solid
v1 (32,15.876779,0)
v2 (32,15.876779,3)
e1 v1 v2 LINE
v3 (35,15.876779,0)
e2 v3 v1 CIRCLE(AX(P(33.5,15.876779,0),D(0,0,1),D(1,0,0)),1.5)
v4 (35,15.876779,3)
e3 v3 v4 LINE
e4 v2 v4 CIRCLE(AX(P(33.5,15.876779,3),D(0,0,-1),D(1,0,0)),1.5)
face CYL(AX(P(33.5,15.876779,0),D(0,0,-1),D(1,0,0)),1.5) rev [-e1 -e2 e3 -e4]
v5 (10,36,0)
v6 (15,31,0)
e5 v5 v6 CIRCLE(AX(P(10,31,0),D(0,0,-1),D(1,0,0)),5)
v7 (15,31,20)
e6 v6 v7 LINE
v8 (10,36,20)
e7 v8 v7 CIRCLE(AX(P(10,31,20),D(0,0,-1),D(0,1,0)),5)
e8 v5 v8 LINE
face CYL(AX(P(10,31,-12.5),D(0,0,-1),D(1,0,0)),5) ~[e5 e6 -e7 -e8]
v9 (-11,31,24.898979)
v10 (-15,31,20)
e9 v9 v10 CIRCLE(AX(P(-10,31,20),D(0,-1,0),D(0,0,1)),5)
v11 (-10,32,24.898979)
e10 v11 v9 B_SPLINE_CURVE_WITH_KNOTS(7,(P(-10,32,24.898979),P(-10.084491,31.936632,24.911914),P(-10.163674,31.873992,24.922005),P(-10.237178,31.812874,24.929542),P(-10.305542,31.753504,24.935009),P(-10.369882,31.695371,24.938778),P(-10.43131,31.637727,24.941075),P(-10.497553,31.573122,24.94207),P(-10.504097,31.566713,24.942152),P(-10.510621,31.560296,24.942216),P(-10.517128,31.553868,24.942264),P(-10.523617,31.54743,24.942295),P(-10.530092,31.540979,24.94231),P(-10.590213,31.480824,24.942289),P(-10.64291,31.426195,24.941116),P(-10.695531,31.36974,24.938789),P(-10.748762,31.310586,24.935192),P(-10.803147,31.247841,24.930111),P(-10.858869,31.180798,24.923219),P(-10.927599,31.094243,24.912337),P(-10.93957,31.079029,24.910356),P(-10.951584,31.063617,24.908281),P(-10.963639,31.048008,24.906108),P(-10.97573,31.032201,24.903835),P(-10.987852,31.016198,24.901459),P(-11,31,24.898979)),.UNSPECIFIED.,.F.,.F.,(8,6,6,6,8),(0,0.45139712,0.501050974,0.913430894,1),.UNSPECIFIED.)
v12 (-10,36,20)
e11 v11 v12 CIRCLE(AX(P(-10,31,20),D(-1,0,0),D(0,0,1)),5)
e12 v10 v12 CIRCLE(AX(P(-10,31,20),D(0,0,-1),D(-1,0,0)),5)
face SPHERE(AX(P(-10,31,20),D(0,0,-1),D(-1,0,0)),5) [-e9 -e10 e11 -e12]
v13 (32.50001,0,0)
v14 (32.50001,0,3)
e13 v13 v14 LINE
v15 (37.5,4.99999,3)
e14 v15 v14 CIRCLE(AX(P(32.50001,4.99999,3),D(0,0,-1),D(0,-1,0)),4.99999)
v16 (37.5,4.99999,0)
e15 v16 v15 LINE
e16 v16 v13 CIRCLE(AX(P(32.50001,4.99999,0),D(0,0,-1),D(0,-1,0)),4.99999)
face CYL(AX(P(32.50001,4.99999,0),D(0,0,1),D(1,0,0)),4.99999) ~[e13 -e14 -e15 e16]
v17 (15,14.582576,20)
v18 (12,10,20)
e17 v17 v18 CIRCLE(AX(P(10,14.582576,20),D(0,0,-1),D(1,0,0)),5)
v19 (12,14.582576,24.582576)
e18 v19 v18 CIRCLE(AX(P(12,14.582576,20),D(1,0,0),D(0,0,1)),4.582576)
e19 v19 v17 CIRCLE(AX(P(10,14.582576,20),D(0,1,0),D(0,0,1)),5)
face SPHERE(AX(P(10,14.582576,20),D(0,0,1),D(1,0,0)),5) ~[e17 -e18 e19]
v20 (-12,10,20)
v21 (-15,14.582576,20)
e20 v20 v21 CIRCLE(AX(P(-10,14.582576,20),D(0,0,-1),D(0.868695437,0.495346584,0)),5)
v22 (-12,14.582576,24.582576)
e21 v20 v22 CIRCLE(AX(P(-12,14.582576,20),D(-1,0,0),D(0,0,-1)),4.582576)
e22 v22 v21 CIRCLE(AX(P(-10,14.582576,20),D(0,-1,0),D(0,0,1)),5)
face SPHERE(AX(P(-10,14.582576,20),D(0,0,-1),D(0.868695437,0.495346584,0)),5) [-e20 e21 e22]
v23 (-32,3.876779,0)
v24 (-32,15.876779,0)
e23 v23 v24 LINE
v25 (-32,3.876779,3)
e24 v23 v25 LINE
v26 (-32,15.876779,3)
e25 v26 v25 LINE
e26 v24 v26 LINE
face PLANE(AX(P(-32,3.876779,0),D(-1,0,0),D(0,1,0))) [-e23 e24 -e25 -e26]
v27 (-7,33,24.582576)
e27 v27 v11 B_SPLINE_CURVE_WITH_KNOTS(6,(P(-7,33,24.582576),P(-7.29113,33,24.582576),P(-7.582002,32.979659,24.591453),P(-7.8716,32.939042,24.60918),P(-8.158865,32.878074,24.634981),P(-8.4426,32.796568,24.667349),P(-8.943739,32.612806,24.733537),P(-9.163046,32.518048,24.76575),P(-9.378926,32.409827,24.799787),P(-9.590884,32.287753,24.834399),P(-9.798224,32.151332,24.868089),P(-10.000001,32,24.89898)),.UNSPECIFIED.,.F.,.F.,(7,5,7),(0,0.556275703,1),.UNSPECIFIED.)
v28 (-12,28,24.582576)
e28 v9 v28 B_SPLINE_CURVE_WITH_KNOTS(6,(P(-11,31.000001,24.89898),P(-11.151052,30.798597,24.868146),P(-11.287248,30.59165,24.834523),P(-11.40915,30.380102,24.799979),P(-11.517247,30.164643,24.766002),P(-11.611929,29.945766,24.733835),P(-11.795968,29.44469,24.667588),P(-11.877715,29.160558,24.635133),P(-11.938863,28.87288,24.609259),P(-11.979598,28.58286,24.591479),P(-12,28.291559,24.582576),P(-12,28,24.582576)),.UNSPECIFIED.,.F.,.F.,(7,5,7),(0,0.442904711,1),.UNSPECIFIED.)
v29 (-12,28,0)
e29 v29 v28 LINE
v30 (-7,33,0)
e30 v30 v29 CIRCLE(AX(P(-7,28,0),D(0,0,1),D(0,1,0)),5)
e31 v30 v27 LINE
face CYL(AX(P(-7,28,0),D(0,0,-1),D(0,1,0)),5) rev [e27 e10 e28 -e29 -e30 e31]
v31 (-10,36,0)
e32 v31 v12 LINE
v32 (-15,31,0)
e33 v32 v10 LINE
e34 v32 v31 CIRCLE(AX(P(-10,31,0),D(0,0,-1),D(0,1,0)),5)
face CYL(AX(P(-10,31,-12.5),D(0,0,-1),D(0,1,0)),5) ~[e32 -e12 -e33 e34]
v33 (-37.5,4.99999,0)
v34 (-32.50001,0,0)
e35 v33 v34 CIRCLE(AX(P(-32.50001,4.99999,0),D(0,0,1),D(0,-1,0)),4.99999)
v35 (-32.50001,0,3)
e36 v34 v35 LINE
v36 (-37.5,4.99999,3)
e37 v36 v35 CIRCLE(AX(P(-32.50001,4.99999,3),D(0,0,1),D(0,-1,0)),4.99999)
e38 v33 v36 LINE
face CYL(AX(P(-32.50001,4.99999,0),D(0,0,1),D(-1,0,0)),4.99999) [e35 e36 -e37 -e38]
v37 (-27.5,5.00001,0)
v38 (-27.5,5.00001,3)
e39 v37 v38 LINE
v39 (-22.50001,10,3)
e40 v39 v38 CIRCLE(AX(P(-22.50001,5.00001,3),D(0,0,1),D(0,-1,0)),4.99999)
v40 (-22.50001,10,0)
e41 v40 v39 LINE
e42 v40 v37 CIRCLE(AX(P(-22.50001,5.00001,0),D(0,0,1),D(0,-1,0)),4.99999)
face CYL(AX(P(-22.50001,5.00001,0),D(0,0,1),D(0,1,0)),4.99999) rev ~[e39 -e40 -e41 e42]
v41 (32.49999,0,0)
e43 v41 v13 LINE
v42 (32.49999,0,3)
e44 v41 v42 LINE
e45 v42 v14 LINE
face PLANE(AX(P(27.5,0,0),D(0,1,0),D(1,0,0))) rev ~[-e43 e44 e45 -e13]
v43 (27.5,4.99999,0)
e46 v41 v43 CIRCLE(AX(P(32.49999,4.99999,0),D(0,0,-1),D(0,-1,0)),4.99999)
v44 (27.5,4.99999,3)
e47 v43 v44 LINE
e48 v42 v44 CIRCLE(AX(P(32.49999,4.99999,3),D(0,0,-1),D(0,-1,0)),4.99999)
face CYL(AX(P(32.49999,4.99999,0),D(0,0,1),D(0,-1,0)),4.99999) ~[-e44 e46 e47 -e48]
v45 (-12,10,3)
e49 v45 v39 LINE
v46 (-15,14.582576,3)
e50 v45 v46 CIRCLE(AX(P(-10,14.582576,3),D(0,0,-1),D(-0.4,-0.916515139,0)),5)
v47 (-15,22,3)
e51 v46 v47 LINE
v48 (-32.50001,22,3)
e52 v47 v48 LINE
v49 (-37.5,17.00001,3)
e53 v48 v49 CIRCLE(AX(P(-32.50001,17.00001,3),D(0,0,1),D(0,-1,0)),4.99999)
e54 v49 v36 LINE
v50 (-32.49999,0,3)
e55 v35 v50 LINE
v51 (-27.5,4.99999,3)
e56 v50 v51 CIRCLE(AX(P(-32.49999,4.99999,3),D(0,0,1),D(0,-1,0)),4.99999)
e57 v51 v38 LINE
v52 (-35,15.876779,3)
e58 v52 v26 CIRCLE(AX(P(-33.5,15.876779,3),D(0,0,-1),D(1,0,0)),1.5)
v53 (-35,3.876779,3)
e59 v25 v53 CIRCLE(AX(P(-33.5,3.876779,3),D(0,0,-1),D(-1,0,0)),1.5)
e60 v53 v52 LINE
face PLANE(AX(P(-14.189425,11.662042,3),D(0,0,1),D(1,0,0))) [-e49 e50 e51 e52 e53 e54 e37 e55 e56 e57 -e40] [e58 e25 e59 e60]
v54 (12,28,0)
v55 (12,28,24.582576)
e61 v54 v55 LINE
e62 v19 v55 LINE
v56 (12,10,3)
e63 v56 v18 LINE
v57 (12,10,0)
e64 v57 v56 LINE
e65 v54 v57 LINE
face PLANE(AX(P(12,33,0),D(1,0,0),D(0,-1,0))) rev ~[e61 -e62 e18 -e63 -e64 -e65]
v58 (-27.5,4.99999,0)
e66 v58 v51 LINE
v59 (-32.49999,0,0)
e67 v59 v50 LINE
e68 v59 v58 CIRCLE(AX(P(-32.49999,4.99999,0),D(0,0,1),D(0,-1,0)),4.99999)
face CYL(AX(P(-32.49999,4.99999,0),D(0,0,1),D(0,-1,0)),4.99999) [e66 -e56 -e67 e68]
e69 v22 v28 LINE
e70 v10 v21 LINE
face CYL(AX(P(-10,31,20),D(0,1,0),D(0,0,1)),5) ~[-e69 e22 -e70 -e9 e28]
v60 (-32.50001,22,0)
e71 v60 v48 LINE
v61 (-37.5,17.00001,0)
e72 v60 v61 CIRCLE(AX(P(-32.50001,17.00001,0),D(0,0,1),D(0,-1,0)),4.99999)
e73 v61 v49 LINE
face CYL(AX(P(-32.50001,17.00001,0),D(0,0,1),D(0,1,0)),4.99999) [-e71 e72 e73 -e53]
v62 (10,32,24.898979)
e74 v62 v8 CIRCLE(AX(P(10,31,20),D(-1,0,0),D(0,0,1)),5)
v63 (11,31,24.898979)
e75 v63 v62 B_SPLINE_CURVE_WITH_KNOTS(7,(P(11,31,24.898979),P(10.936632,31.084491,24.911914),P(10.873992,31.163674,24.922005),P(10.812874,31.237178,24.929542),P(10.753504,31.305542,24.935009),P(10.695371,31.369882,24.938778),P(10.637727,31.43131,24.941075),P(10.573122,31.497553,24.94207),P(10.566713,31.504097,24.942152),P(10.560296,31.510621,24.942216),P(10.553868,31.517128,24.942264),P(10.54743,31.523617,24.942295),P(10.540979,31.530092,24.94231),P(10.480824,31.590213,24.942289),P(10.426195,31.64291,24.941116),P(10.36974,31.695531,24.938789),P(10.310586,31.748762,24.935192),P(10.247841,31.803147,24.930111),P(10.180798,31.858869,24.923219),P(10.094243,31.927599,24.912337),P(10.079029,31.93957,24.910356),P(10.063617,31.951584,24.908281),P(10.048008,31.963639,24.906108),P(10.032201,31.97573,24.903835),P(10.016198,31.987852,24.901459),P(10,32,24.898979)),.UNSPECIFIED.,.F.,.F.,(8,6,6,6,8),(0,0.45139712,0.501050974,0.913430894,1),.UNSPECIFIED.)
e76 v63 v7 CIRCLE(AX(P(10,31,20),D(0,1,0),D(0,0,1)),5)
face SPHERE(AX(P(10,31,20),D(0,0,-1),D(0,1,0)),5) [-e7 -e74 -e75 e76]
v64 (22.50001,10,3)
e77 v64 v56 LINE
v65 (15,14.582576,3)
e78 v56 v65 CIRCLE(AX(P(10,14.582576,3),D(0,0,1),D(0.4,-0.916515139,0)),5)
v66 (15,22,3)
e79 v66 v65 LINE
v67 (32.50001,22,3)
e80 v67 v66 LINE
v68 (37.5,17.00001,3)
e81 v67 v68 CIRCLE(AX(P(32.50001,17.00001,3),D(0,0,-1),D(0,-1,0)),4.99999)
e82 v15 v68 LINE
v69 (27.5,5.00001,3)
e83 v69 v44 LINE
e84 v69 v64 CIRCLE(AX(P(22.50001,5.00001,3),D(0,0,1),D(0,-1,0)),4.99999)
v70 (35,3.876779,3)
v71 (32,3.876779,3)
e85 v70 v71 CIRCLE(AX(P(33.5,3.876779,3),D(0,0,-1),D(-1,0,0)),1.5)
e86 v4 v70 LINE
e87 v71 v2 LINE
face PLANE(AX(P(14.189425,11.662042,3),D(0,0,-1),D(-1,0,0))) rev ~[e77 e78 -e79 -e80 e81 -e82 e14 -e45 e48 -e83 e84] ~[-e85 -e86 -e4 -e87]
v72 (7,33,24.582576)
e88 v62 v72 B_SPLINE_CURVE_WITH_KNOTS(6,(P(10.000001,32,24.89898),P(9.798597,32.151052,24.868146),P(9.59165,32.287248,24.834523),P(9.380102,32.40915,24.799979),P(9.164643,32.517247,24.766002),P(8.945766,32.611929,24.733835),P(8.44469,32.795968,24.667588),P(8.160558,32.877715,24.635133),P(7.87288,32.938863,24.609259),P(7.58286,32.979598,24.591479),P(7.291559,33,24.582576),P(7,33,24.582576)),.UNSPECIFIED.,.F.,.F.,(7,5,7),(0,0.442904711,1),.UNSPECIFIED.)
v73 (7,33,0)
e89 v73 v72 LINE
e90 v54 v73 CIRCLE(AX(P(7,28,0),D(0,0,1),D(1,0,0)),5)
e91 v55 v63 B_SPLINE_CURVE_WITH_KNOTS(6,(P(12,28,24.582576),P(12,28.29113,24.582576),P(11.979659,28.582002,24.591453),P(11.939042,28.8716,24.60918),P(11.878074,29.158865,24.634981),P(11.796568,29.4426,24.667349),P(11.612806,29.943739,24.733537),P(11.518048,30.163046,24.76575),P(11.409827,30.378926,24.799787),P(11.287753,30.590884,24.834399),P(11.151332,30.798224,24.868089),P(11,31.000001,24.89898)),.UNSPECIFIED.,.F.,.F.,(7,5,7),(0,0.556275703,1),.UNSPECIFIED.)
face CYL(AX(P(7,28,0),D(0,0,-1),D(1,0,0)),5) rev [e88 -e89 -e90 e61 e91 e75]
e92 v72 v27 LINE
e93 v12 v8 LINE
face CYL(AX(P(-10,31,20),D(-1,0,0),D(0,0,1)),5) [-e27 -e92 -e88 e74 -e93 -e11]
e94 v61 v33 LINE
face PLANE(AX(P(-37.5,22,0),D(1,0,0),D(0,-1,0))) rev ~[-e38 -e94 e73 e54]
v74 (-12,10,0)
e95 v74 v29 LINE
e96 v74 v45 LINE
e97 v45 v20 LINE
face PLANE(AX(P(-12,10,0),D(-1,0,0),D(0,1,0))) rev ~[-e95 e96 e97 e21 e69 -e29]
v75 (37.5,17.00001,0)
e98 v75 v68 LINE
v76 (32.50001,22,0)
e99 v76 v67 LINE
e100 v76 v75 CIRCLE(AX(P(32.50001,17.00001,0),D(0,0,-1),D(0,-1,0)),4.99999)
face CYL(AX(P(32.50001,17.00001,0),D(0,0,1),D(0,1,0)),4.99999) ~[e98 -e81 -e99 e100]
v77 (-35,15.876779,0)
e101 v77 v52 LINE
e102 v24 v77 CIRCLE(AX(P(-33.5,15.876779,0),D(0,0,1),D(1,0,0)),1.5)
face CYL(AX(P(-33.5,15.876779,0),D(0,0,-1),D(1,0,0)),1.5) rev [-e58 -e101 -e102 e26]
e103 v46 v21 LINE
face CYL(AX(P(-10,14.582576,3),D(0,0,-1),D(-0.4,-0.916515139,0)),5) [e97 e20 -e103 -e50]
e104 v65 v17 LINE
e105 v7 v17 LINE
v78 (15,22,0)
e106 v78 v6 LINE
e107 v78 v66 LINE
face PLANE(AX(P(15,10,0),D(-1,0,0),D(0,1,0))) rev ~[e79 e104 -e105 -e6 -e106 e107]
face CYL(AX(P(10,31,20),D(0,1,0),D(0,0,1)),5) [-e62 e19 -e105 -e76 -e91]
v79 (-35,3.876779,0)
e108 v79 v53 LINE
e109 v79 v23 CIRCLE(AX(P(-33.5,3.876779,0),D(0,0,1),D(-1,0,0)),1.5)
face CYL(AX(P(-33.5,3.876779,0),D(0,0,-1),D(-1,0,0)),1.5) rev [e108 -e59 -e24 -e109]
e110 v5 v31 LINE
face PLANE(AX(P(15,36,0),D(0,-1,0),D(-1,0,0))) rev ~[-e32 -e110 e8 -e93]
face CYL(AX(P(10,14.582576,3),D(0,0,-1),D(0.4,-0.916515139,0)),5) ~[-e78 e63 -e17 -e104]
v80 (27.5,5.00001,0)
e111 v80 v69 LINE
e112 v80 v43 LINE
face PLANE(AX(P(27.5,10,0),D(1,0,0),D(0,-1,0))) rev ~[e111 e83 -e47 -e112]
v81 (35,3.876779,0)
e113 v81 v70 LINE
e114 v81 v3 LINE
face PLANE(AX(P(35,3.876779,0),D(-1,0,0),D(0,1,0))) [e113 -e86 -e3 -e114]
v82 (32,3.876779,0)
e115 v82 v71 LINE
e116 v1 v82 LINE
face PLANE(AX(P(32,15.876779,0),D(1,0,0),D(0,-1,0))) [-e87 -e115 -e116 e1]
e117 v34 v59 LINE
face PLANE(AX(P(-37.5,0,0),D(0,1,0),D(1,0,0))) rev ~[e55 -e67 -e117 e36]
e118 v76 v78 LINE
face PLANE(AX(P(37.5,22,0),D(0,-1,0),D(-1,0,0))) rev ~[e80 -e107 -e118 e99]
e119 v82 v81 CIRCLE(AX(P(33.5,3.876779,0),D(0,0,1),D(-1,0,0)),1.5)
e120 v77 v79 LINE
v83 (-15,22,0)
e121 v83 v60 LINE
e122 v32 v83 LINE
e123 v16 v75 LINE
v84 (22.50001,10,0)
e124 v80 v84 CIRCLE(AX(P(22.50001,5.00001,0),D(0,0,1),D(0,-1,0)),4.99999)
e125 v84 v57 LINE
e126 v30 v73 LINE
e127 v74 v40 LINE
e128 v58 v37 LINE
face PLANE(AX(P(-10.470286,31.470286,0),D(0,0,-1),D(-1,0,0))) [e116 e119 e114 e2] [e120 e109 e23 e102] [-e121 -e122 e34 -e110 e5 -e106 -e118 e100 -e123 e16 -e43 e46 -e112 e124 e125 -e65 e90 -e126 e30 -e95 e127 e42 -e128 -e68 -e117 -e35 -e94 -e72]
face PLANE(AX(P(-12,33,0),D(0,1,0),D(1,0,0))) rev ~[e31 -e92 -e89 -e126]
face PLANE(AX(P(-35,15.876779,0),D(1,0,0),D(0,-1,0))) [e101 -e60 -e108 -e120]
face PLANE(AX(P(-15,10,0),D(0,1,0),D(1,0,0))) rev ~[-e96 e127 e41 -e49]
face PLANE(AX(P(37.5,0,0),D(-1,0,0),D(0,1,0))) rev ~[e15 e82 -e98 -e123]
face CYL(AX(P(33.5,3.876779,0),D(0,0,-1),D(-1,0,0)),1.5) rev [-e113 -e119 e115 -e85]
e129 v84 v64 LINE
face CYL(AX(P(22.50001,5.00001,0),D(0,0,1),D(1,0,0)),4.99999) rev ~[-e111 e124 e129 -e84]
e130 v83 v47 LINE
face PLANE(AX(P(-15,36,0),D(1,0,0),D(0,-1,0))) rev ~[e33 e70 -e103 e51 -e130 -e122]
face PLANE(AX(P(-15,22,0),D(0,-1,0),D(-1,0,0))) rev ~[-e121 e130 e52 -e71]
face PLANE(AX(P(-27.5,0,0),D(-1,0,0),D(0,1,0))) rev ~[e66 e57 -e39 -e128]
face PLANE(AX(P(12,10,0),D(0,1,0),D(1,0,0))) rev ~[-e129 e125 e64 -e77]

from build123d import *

# Parameters (mm, degrees)
F2_DEPTH     = 25
F3_DEPTH     = 3
F4_DEPTH     = 25
F5_R         = 4.99999
F6_T1_DEPTH  = 25
F6_T3_DEPTH  = 25
F6_T5_DEPTH  = 50
F6_T7_DEPTH  = 33.4564392374
F6_T9_DEPTH  = 50
F6_T11_DEPTH = 33.4564392374
F7_T1_DEPTH  = 16.417424305
F7_T3_DEPTH  = 20
F7_T6_ANGLE  = 89.9999999974
F7_T8_ANGLE  = 89.9999999974
F7_T10_ANGLE = 209.6926070845
F7_T12_ANGLE = 209.6926070845


# Not quite as in the source:
# - a fillet or chamfer that OpenCascade refuses, or shapes differently, is made with other operations: its cross-section is extruded or revolved along the edge and cut away or added
# - a fillet or chamfer is up to 0.001 mm smaller than in the source, because OpenCascade refuses the exact size


with BuildPart() as f2:
    # F0 (on Top) → F2 (new body)
    with BuildSketch(Plane.XY):
        Polygon((15, 36), (0, 36), (-15, 36), (-15, 22), (-15, 10), (-12, 10), (-12, 33), (0, 33), (12, 33), (12, 10), (15, 10), (15, 22), align=None)
    extrude(amount=F2_DEPTH)

    # F0 (on Top) → F3 (join)
    with BuildSketch(Plane.XY):
        Polygon((-15, 10), (-15, 22), (-37.5, 22), (-37.5, 0), (-27.5, 0), (-27.5, 10), align=None)
        Polygon((37.5, 22), (15, 22), (15, 10), (27.5, 10), (27.5, 0), (37.5, 0), align=None)
    extrude(amount=F3_DEPTH)

    # F1 (on Top) → F4 (cut)
    with BuildSketch(Plane.XY):
        with BuildLine():
            Line((35, 3.8767794613), (35, 15.8767794613))
            ThreePointArc((35, 15.8767794613), (33.5, 17.3767794613), (32, 15.8767794613))
            Line((32, 15.8767794613), (32, 3.8767794613))
            ThreePointArc((32, 3.8767794613), (33.5, 2.3767794613), (35, 3.8767794613))
        make_face()
        with BuildLine():
            ThreePointArc((-32, 15.8767794613), (-33.5, 17.3767794613), (-35, 15.8767794613))
            Line((-35, 15.8767794613), (-35, 3.8767794613))
            ThreePointArc((-35, 3.8767794613), (-33.5, 2.3767794613), (-32, 3.8767794613))
            Line((-32, 3.8767794613), (-32, 15.8767794613))
        make_face()
    extrude(amount=F4_DEPTH, mode=Mode.SUBTRACT)

    # F5 (radius 5 in the source; OpenCascade refuses exactly that, so slightly less here)
    f5_edges = [f2.edges().sort_by_distance(p)[0] for p in [
        (-37.5, 0, 1.5),
        (-27.5, 0, 1.5),
        (-37.5, 22, 1.5),
        (37.5, 22, 1.5),
        (37.5, 0, 1.5),
        (27.5, 0, 1.5),
        (27.5, 10, 1.5),
        (-27.5, 10, 1.5),
    ]]
    fillet(f5_edges, radius=F5_R)

    # F6: fillet of radius 5 on 6 edges, made by hand

    # F6_s2 → F6_t1 (join)
    with BuildSketch(Plane.XY):
        with BuildLine():
            ThreePointArc((12, 28), (10.5355339059, 31.5355339059), (7, 33))
            Line((7, 33), (12, 33))
            Line((12, 33), (12, 28))
        make_face()
    extrude(amount=F6_T1_DEPTH)

    # F6_s4 → F6_t3 (join)
    with BuildSketch(Plane.XY):
        with BuildLine():
            ThreePointArc((-7, 33), (-10.5355339059, 31.5355339059), (-12, 28))
            Line((-12, 28), (-12, 33))
            Line((-12, 33), (-7, 33))
        make_face()
    extrude(amount=F6_T3_DEPTH)

    # F6_s6 → F6_t5 (cut)
    with BuildSketch(Plane.XY.offset(-12.5)):
        with BuildLine():
            ThreePointArc((15, 31), (13.5355339059, 34.5355339059), (10, 36))
            Line((10, 36), (15, 36))
            Line((15, 36), (15, 31))
        make_face()
    extrude(amount=F6_T5_DEPTH, mode=Mode.SUBTRACT)

    # F6_s8 → F6_t7 (cut)
    with BuildSketch(Plane.XY.offset(3)):
        with BuildLine():
            ThreePointArc((12, 10), (14.1833001327, 11.8439629074), (15, 14.582575695))
            Line((15, 14.582575695), (15, 10))
            Line((15, 10), (12, 10))
        make_face()
    extrude(amount=F6_T7_DEPTH, mode=Mode.SUBTRACT)

    # F6_s10 → F6_t9 (cut)
    with BuildSketch(Plane.XY.offset(-12.5)):
        with BuildLine():
            ThreePointArc((-10, 36), (-13.5355339059, 34.5355339059), (-15, 31))
            Line((-15, 31), (-15, 36))
            Line((-15, 36), (-10, 36))
        make_face()
    extrude(amount=F6_T9_DEPTH, mode=Mode.SUBTRACT)

    # F6_s12 → F6_t11 (cut)
    with BuildSketch(Plane.XY.offset(3)):
        with BuildLine():
            ThreePointArc((-12, 10), (-14.1833001327, 11.8439629074), (-15, 14.582575695))
            Line((-15, 14.582575695), (-15, 10))
            Line((-15, 10), (-12, 10))
        make_face()
    extrude(amount=F6_T11_DEPTH, mode=Mode.SUBTRACT)

    # F7: fillet of radius 5 on 3 edges, made by hand

    # F7_s2 → F7_t1 (cut)
    with BuildSketch(Plane.XZ.offset(-31)):
        with BuildLine():
            ThreePointArc((-10, 25), (-13.5355339059, 23.5355339059), (-15, 20))
            Line((-15, 20), (-15, 25))
            Line((-15, 25), (-10, 25))
        make_face()
        with BuildLine():
            ThreePointArc((10, 25), (13.5355339059, 23.5355339059), (15, 20))
            Line((15, 20), (15, 25))
            Line((15, 25), (10, 25))
        make_face()
    extrude(amount=F7_T1_DEPTH, mode=Mode.SUBTRACT)

    # F7_s4 → F7_t3 (cut)
    with BuildSketch(Plane.YZ.offset(-10)):
        with BuildLine():
            ThreePointArc((31, 25), (34.5355339059, 23.5355339059), (36, 20))
            Line((36, 20), (36, 25))
            Line((36, 25), (31, 25))
        make_face()
    extrude(amount=F7_T3_DEPTH, mode=Mode.SUBTRACT)

    # F7_s5 → F7_t6 (revolve, cut)
    with BuildSketch(Plane.YZ.offset(9.9999999999)):
        with BuildLine():
            ThreePointArc((31, 25), (34.5355339059, 23.5355339059), (36, 20))
            Line((36, 20), (36, 25))
            Line((36, 25), (31, 25))
        make_face()
    revolve(axis=Axis((9.9999999999, 30.9999999999, 25), (0, 0, -1)), revolution_arc=F7_T6_ANGLE, mode=Mode.SUBTRACT)

    # F7_s7 → F7_t8 (revolve, cut)
    with BuildSketch(Plane.XZ.offset(-30.9999999999)):
        with BuildLine():
            ThreePointArc((-10, 25), (-13.5355339059, 23.5355339059), (-15, 20))
            Line((-15, 20), (-15, 25))
            Line((-15, 25), (-10, 25))
        make_face()
    revolve(axis=Axis((-9.9999999999, 30.9999999999, 25), (0, 0, -1)), revolution_arc=F7_T8_ANGLE, mode=Mode.SUBTRACT)

    # F7_s9 → F7_t10 (revolve, cut)
    with BuildSketch(Plane.XZ.offset(-14.5825756948)):
        with BuildLine():
            ThreePointArc((15, 20), (13.5355339059, 23.5355339059), (10, 25))
            Line((10, 25), (15, 25))
            Line((15, 25), (15, 20))
        make_face()
    revolve(axis=Axis((10.0000000002, 14.5825756948, 25), (0, 0, -1)), revolution_arc=F7_T10_ANGLE, mode=Mode.SUBTRACT)

    # F7_s11 → F7_t12 (revolve, cut)
    with BuildSketch(Plane(origin=(-8.7286422437, 15.307527957, 0), x_dir=(0, 0, 1), z_dir=(-0.4953465841, 0.8686954366, 0))):
        with BuildLine():
            ThreePointArc((25, -1.4635253083), (23.5355339059, 2.0720085977), (20, 3.5364746917))
            Line((20, 3.5364746917), (25, 3.5364746917))
            Line((25, 3.5364746917), (25, -1.4635253083))
        make_face()
    revolve(axis=Axis((-10.0000000002, 14.5825756948, 25), (0, 0, -1)), revolution_arc=F7_T12_ANGLE, mode=Mode.SUBTRACT)


solid = f2.part
